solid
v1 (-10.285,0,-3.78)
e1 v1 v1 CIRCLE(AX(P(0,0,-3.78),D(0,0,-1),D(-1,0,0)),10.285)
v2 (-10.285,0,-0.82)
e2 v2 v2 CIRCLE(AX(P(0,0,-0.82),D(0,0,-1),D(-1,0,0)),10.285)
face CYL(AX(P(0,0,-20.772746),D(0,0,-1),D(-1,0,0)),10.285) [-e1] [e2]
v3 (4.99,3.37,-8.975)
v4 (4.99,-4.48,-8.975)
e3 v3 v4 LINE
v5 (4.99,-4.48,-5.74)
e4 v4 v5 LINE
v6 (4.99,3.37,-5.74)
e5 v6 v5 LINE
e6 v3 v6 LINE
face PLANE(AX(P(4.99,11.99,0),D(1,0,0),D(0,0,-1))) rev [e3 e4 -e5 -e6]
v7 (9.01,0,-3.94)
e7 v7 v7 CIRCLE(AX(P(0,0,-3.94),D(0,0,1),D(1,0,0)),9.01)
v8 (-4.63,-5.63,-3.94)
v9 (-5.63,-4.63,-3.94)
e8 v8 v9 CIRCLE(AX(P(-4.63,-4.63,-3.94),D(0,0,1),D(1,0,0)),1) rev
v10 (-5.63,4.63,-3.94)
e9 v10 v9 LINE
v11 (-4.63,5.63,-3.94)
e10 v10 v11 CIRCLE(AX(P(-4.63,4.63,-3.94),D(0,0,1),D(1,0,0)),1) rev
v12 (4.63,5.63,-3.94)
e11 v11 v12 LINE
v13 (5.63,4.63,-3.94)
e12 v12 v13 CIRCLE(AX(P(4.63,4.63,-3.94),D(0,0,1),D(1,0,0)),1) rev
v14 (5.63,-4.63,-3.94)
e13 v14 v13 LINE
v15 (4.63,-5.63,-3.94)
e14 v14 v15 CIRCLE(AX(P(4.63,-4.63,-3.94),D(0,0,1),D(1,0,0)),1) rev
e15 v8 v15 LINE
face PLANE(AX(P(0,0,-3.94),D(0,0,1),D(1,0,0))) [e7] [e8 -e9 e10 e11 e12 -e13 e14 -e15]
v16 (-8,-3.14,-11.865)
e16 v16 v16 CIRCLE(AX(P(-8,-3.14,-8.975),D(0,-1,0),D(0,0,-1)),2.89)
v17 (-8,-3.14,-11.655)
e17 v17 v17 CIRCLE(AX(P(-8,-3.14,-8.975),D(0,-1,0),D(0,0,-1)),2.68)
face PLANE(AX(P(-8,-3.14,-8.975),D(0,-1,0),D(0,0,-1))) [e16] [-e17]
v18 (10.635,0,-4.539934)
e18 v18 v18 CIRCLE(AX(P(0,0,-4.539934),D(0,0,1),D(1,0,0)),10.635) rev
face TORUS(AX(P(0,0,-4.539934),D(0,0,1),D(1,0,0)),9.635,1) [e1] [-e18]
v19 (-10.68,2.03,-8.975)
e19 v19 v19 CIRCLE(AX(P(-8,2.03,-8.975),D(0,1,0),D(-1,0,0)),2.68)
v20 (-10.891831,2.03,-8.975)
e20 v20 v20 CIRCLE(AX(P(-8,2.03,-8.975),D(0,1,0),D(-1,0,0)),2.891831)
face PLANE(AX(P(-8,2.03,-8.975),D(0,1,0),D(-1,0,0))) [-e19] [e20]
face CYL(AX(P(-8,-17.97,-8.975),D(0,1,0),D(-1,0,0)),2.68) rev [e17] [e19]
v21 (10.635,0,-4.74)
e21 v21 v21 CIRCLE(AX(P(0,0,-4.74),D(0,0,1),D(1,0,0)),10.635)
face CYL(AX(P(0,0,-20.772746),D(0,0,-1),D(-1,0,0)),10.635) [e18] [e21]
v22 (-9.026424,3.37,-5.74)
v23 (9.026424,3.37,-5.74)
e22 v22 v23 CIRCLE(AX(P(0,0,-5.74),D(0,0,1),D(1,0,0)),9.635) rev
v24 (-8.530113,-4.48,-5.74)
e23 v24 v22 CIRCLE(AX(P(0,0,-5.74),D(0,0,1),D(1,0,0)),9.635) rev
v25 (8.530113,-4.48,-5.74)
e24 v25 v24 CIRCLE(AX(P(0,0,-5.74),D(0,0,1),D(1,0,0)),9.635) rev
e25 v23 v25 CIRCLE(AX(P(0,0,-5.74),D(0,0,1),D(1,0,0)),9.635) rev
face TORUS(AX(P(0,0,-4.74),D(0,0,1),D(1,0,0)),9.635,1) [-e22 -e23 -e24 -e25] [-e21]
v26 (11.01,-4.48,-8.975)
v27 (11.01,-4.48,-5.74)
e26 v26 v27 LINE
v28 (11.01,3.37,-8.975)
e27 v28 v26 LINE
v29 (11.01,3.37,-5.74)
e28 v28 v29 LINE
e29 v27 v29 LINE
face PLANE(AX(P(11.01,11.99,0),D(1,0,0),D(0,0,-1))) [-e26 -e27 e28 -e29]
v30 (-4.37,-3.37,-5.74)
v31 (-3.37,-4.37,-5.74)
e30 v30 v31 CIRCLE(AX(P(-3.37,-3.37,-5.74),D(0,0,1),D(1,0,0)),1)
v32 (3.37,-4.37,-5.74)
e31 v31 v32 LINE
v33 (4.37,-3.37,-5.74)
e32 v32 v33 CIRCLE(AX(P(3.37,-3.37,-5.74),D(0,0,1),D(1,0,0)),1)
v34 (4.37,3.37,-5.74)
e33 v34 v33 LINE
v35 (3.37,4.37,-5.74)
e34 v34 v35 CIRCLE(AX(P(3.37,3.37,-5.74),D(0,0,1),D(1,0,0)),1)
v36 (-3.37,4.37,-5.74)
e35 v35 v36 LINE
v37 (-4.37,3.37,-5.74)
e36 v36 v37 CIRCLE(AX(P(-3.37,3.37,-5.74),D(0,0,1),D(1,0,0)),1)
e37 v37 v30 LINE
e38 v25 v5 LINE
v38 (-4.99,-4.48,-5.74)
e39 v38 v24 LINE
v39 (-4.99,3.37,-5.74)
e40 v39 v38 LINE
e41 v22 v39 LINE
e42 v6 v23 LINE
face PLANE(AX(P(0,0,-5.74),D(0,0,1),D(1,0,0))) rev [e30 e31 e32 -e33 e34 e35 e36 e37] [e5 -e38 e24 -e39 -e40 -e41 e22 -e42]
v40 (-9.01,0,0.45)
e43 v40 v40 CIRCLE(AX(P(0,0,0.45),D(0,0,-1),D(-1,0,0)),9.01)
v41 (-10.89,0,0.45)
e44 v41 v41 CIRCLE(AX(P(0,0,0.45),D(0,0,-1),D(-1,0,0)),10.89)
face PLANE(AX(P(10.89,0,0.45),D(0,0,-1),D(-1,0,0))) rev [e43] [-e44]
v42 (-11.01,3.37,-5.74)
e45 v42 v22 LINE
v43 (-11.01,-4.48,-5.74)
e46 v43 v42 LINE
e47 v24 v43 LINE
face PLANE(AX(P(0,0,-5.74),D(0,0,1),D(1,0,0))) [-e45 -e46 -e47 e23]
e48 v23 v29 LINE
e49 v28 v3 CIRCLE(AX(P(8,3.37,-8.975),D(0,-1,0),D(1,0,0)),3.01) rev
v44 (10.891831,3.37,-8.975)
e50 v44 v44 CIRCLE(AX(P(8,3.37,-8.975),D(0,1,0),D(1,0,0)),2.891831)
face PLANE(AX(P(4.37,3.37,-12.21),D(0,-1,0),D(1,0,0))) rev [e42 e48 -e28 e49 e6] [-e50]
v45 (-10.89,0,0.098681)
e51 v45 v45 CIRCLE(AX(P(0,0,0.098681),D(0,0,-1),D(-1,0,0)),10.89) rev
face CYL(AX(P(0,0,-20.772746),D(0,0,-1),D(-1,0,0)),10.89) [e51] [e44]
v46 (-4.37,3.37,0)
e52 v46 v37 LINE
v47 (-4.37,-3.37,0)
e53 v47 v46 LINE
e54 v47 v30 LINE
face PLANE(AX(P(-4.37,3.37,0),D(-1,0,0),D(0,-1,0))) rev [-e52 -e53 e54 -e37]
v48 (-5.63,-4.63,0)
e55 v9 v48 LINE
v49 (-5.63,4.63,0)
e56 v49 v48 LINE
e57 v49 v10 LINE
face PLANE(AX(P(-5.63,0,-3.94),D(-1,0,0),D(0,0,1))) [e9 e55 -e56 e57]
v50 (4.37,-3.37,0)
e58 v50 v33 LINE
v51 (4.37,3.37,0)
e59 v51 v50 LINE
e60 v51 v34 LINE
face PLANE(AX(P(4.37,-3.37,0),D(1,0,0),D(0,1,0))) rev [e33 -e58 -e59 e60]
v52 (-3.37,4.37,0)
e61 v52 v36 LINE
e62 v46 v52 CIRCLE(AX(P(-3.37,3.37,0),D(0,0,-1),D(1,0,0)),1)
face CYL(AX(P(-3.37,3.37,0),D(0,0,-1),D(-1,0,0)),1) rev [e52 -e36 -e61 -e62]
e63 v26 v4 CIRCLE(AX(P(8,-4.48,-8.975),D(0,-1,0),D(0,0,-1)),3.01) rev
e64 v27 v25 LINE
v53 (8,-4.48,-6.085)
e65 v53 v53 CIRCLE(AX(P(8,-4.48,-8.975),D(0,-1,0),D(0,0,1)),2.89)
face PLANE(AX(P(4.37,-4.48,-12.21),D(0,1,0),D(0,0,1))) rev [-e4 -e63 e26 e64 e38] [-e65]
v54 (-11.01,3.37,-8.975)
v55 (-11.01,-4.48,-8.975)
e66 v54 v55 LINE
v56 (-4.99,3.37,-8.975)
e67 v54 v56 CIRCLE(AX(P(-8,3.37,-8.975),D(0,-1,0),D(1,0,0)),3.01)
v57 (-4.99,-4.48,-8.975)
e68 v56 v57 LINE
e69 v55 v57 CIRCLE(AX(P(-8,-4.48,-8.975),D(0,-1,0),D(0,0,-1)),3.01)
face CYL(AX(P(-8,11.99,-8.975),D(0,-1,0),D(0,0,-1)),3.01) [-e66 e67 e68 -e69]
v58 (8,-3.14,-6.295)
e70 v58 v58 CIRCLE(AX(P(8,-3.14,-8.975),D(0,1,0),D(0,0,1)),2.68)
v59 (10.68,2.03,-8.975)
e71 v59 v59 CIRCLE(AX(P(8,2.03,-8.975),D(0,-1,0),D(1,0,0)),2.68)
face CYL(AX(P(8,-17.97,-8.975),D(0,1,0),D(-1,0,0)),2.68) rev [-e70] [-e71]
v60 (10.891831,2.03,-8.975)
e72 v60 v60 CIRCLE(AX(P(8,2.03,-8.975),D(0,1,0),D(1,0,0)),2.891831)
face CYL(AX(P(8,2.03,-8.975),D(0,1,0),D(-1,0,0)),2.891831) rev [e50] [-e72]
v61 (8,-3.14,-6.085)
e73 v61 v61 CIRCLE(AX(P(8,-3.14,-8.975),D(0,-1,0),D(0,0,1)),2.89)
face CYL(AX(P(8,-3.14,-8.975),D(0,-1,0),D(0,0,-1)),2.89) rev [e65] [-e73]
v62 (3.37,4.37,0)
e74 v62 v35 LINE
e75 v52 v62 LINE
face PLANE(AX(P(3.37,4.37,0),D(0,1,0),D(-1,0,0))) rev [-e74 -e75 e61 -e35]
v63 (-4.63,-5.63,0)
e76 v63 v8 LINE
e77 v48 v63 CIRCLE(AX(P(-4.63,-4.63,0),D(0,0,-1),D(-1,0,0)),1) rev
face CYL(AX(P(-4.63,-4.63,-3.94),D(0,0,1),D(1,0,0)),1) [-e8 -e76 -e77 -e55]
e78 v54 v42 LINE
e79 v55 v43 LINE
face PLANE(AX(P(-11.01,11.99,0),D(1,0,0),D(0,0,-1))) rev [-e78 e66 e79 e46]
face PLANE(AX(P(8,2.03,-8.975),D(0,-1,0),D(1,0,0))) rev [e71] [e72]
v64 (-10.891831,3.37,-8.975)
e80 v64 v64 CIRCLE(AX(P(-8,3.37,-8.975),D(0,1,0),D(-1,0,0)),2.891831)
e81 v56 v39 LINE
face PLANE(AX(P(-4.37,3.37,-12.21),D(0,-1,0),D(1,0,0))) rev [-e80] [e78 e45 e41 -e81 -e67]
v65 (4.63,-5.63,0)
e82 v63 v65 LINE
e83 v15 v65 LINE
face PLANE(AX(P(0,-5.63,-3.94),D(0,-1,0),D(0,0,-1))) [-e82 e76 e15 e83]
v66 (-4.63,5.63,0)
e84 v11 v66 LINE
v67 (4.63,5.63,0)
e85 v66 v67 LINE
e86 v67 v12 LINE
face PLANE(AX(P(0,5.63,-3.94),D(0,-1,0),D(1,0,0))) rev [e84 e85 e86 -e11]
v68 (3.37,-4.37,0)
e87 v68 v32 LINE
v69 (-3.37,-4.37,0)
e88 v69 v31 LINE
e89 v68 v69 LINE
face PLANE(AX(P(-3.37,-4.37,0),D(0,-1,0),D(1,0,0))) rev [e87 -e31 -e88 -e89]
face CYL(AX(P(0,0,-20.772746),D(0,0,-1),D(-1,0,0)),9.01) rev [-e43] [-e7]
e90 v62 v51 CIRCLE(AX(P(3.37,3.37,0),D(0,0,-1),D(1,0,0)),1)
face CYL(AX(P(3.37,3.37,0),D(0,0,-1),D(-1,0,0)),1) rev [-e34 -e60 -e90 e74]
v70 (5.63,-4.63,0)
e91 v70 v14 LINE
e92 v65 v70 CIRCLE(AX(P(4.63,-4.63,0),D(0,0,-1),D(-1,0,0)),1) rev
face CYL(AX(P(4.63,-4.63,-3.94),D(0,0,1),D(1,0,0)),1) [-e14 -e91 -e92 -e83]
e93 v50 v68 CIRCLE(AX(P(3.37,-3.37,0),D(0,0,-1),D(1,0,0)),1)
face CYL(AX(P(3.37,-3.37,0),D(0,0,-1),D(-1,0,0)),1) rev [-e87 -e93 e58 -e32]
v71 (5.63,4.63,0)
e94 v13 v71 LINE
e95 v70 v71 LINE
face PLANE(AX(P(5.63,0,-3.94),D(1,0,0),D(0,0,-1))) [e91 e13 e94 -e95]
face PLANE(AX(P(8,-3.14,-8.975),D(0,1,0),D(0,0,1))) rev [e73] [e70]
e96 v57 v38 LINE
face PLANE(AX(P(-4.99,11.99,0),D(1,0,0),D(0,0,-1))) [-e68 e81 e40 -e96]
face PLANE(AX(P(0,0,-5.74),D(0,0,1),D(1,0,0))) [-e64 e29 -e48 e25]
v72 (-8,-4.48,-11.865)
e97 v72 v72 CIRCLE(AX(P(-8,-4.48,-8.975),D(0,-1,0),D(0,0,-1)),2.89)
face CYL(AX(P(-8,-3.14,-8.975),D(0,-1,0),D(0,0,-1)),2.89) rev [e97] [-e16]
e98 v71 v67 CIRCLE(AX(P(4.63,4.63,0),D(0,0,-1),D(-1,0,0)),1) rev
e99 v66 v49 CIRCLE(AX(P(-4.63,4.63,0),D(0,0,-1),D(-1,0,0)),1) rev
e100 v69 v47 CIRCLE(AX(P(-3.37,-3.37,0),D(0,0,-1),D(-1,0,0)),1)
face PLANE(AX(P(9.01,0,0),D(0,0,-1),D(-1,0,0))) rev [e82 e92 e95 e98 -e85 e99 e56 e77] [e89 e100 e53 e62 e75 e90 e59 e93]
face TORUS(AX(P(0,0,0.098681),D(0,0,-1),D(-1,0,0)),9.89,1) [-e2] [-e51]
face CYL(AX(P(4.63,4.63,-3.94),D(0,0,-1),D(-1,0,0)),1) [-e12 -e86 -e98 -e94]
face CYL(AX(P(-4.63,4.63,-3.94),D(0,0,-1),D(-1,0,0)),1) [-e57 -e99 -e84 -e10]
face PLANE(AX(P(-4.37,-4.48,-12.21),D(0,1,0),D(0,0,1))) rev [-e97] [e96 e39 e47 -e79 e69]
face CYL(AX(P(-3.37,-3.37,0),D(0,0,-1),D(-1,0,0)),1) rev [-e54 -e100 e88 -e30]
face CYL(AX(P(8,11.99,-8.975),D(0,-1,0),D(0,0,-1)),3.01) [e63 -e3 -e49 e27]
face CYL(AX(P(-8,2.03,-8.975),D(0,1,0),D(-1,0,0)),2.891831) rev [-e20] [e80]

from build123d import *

# Parameters (mm, degrees)
FILLET3_R           = 1
CUT_EXTRUDE6_START  = -3.94
CUT_EXTRUDE6_DEPTH  = 3.94
FILLET5_R           = 1
CUT_EXTRUDE7_DEPTH  = 10.94
SKETCH14_W          = 7.26
SKETCH14_H          = 7.85
BOSS_EXTRUDE2_DEPTH = 6.47
CUT_EXTRUDE16_DEPTH = 16.47
SKETCH19_R          = 2.891830788
SKETCH19_R_2        = 2.68
CUT_EXTRUDE20_DEPTH = 1.34
CUT_EXTRUDE21_START = -1.34
SKETCH21_R          = 2.89
SKETCH21_R_2        = 2.68
CUT_EXTRUDE21_DEPTH = 1.34
SKETCH23_R          = 2.68
CUT_EXTRUDE22_DEPTH = 21.34


with BuildPart() as part:
    # Sketch1 → Revolve1 (revolve)
    with BuildSketch(Plane(origin=(0, 0, 0), x_dir=(1, 0, 0), z_dir=(0, 1, 0)), mode=Mode.PRIVATE) as revolve1_sk:
        Polygon((0, 5.74), (10.635, 5.74), (10.635, 3.78), (10.285, 3.78), (10.285, 0.82), (10.89, 0.82), (10.89, -0.45), (9.01, -0.45), (9.01, 0), (0, 0), align=None)
    revolve(revolve1_sk.sketch.rotate(Axis((0, 0, -20.772745763), (0, 0, 1)), 180), axis=Axis((0, 0, -20.772745763), (0, 0, 1)))

    # Fillet3
    # the kernel refuses this fillet: 1 mm, written as the material it takes off along each edge
    with BuildSketch(Plane(origin=(0, 0, -3.78), x_dir=(-1, 0, 0), z_dir=(0, 1, 0))) as fillet3_piece_1:
        with BuildLine():
            CenterArc((9.635, -0.759934208), FILLET3_R, 0, 49.458398126)
            Line((10.285, 0), (10.298, 0.015198684))
            ThreePointArc((10.298, 0.015198684), (10.46, 0.02), (10.635, 0.02))
            Line((10.635, 0.02), (10.655, 0))
            Line((10.655, 0), (10.655, -0.759934208))
            Line((10.655, -0.759934208), (10.635, -0.759934208))
        make_face()
    revolve(axis=Axis((0, 0, -3.78), (0, 0, 1)), mode=Mode.SUBTRACT)
    with BuildSketch(Plane(origin=(0, 0, -5.74), x_dir=(-1, 0, 0), z_dir=(0, 1, 0))) as fillet3_piece_2:
        with BuildLine():
            CenterArc((10.635 - FILLET3_R, FILLET3_R), FILLET3_R, 270, 90)
            Line((10.635, FILLET3_R), (10.635 + FILLET3_R * 0.02, FILLET3_R))
            Line((10.635 + FILLET3_R * 0.02, FILLET3_R), (10.635 + FILLET3_R * 0.02, -FILLET3_R * 0.02))
            Line((10.635 + FILLET3_R * 0.02, -FILLET3_R * 0.02), (10.635 - FILLET3_R, -FILLET3_R * 0.02))
            Line((10.635 - FILLET3_R, -FILLET3_R * 0.02), (10.635 - FILLET3_R, 0))
        make_face()
    revolve(axis=Axis((0, 0, -5.74), (0, 0, 1)), mode=Mode.SUBTRACT)
    with BuildSketch(Plane(origin=(0, 0, -0.82), x_dir=(-1, 0, 0), z_dir=(0, 1, 0))) as fillet3_piece_3:
        with BuildLine():
            CenterArc((9.89, 0.91868112), FILLET3_R, 293.265974062, 66.734025938)
            Line((10.89, 0.91868112), (10.91, 0.91868112))
            Line((10.91, 0.91868112), (10.91, 0))
            Line((10.91, 0), (10.89, -0.02))
            ThreePointArc((10.89, -0.02), (10.5875, -0.02), (10.2929, -0.018373622))
            Line((10.2929, -0.018373622), (10.285, 0))
        make_face()
    revolve(axis=Axis((0, 0, -0.82), (0, 0, 1)), mode=Mode.SUBTRACT)

    # Sketch13 → Cut-Extrude6 (cut)
    with BuildSketch(Plane.XY.offset(CUT_EXTRUDE6_START)):
        with BuildLine():
            Line((-5.63, -5.63), (-5.63, 5.63))
            Line((-5.63, 5.63), (-5.63, 7.034429614))
            ThreePointArc((-5.63, 7.034429614), (-9.01, 0), (-5.63, -7.034429614))
            Line((-5.63, -7.034429614), (-5.63, -5.63))
        make_face()
        with BuildLine():
            Line((5.63, -5.63), (-5.63, -5.63))
            Line((-5.63, -5.63), (-5.63, -7.034429614))
            ThreePointArc((-5.63, -7.034429614), (0, -9.01), (5.63, -7.034429614))
            Line((5.63, -7.034429614), (5.63, -5.63))
        make_face()
        with BuildLine():
            Line((5.63, 7.034429614), (5.63, 5.63))
            Line((5.63, 5.63), (5.63, -5.63))
            Line((5.63, -5.63), (5.63, -7.034429614))
            ThreePointArc((5.63, -7.034429614), (8.121157553, -3.902166065), (9.01, 0))
            ThreePointArc((9.01, 0), (8.121157553, 3.902166065), (5.63, 7.034429614))
        make_face()
        with BuildLine():
            Line((-5.63, 7.034429614), (-5.63, 5.63))
            Line((-5.63, 5.63), (5.63, 5.63))
            Line((5.63, 5.63), (5.63, 7.034429614))
            ThreePointArc((5.63, 7.034429614), (0, 9.01), (-5.63, 7.034429614))
        make_face()
    extrude(amount=CUT_EXTRUDE6_DEPTH, mode=Mode.SUBTRACT)

    # Fillet5
    fillet5_edges = [part.edges().sort_by_distance(p)[0] for p in [
        (-5.63, 5.63, -1.97),
        (-5.63, -5.63, -1.97),
        (5.63, -5.63, -1.97),
        (5.63, 5.63, -1.97),
    ]]
    fillet(fillet5_edges, radius=FILLET5_R)

    # 3DSketch1 → Cut-Extrude7 (cut)
    with BuildSketch(Plane(origin=(-4.37, -4.37, 0), x_dir=(0.7071067811865485, 0.7071067811865467, 0), z_dir=(0, 0, -1))):
        with BuildLine():
            Line((0.707106781, 0.707106781), (5.473006486, 5.473006486))
            ThreePointArc((5.473006486, 5.473006486), (6.180113268, 5.765899705), (6.887220049, 5.473006486))
            Line((6.887220049, 5.473006486), (11.653119754, 0.707106781))
            ThreePointArc((11.653119754, 0.707106781), (11.946012973, 0), (11.653119754, -0.707106781))
            Line((11.653119754, -0.707106781), (6.887220049, -5.473006486))
            ThreePointArc((6.887220049, -5.473006486), (6.180113268, -5.765899705), (5.473006486, -5.473006486))
            Line((5.473006486, -5.473006486), (0.707106781, -0.707106781))
            ThreePointArc((0.707106781, -0.707106781), (0.414213562, 0), (0.707106781, 0.707106781))
        make_face()
    extrude(amount=CUT_EXTRUDE7_DEPTH, mode=Mode.SUBTRACT)

    # Sketch14 → Boss-Extrude2 (add)
    with BuildSketch(Plane(origin=(0, 0, -5.74), x_dir=(-1, 0, 0), z_dir=(0, 0, -1))):
        with Locations((-8, -0.555)):
            Rectangle(SKETCH14_W, SKETCH14_H)
        with Locations((8, -0.555)):
            Rectangle(SKETCH14_W, SKETCH14_H)
    extrude(amount=BOSS_EXTRUDE2_DEPTH)

    # Sketch16 → Cut-Extrude16 (cut)
    with BuildSketch(Plane.XZ.offset(4.48)):
        with BuildLine():
            ThreePointArc((-4.99, -8.975), (-8, -11.985), (-11.01, -8.975))
            Line((-11.01, -8.975), (-11.01, -5.74))
            Line((-11.01, -5.74), (-11.63, -5.74))
            Line((-11.63, -5.74), (-11.63, -12.21))
            Line((-11.63, -12.21), (-4.37, -12.21))
            Line((-4.37, -12.21), (-4.37, -5.74))
            Line((-4.37, -5.74), (-4.99, -5.74))
            Line((-4.99, -5.74), (-4.99, -8.975))
        make_face()
        with BuildLine():
            ThreePointArc((11.01, -8.975), (8, -11.985), (4.99, -8.975))
            Line((4.99, -8.975), (4.99, -5.74))
            Line((4.99, -5.74), (4.37, -5.74))
            Line((4.37, -5.74), (4.37, -12.21))
            Line((4.37, -12.21), (11.63, -12.21))
            Line((11.63, -12.21), (11.63, -5.74))
            Line((11.63, -5.74), (11.01, -5.74))
            Line((11.01, -5.74), (11.01, -8.975))
        make_face()
    extrude(amount=-CUT_EXTRUDE16_DEPTH, mode=Mode.SUBTRACT)

    # Sketch19 → Cut-Extrude20 (cut)
    # profile 1 of 2: a face of its own
    with BuildSketch(Plane(origin=(0, 3.37, 0), x_dir=(1, 0, 0), z_dir=(0, 1, 0))):
        with Locations(Location((-8, 8.975, 0), (0, 0, 180))):
            Circle(SKETCH19_R)
        with Locations(Location((-8, 8.975, 0), (0, 0, 180))):
            Circle(SKETCH19_R_2, mode=Mode.SUBTRACT)
    # profile 2 of 2: a face of its own
    with BuildSketch(Plane(origin=(0, 3.37, 0), x_dir=(1, 0, 0), z_dir=(0, 1, 0))):
        with Locations((8, 8.975)):
            Circle(SKETCH19_R)
        with Locations((8, 8.975)):
            Circle(SKETCH19_R_2, mode=Mode.SUBTRACT)
    extrude(amount=-CUT_EXTRUDE20_DEPTH, mode=Mode.SUBTRACT)

    # Sketch21 → Cut-Extrude21 (cut)
    # profile 1 of 2: a face of its own
    with BuildSketch(Plane.XZ.offset(4.48).offset(CUT_EXTRUDE21_START)):
        with Locations(Location((-8, -8.975, 0), (0, 0, 270))):
            Circle(SKETCH21_R)
        with Locations(Location((-8, -8.975, 0), (0, 0, 180))):
            Circle(SKETCH21_R_2, mode=Mode.SUBTRACT)
    # profile 2 of 2: a face of its own
    with BuildSketch(Plane.XZ.offset(4.48).offset(CUT_EXTRUDE21_START)):
        with Locations(Location((8, -8.975, 0), (0, 0, 90))):
            Circle(SKETCH21_R)
        with Locations((8, -8.975)):
            Circle(SKETCH21_R_2, mode=Mode.SUBTRACT)
    extrude(amount=CUT_EXTRUDE21_DEPTH, mode=Mode.SUBTRACT)

    # Sketch23 → Cut-Extrude22 (cut)
    with BuildSketch(Plane(origin=(0, 3.37, 0), x_dir=(1, 0, 0), z_dir=(0, 1, 0))):
        with Locations(Location((-8, 8.975, 0), (0, 0, 180))):
            Circle(SKETCH23_R)
        with Locations(Location((8, 8.975, 0), (0, 0, 270))):
            Circle(SKETCH23_R)
    extrude(amount=-CUT_EXTRUDE22_DEPTH, mode=Mode.SUBTRACT)


solid = part.part
